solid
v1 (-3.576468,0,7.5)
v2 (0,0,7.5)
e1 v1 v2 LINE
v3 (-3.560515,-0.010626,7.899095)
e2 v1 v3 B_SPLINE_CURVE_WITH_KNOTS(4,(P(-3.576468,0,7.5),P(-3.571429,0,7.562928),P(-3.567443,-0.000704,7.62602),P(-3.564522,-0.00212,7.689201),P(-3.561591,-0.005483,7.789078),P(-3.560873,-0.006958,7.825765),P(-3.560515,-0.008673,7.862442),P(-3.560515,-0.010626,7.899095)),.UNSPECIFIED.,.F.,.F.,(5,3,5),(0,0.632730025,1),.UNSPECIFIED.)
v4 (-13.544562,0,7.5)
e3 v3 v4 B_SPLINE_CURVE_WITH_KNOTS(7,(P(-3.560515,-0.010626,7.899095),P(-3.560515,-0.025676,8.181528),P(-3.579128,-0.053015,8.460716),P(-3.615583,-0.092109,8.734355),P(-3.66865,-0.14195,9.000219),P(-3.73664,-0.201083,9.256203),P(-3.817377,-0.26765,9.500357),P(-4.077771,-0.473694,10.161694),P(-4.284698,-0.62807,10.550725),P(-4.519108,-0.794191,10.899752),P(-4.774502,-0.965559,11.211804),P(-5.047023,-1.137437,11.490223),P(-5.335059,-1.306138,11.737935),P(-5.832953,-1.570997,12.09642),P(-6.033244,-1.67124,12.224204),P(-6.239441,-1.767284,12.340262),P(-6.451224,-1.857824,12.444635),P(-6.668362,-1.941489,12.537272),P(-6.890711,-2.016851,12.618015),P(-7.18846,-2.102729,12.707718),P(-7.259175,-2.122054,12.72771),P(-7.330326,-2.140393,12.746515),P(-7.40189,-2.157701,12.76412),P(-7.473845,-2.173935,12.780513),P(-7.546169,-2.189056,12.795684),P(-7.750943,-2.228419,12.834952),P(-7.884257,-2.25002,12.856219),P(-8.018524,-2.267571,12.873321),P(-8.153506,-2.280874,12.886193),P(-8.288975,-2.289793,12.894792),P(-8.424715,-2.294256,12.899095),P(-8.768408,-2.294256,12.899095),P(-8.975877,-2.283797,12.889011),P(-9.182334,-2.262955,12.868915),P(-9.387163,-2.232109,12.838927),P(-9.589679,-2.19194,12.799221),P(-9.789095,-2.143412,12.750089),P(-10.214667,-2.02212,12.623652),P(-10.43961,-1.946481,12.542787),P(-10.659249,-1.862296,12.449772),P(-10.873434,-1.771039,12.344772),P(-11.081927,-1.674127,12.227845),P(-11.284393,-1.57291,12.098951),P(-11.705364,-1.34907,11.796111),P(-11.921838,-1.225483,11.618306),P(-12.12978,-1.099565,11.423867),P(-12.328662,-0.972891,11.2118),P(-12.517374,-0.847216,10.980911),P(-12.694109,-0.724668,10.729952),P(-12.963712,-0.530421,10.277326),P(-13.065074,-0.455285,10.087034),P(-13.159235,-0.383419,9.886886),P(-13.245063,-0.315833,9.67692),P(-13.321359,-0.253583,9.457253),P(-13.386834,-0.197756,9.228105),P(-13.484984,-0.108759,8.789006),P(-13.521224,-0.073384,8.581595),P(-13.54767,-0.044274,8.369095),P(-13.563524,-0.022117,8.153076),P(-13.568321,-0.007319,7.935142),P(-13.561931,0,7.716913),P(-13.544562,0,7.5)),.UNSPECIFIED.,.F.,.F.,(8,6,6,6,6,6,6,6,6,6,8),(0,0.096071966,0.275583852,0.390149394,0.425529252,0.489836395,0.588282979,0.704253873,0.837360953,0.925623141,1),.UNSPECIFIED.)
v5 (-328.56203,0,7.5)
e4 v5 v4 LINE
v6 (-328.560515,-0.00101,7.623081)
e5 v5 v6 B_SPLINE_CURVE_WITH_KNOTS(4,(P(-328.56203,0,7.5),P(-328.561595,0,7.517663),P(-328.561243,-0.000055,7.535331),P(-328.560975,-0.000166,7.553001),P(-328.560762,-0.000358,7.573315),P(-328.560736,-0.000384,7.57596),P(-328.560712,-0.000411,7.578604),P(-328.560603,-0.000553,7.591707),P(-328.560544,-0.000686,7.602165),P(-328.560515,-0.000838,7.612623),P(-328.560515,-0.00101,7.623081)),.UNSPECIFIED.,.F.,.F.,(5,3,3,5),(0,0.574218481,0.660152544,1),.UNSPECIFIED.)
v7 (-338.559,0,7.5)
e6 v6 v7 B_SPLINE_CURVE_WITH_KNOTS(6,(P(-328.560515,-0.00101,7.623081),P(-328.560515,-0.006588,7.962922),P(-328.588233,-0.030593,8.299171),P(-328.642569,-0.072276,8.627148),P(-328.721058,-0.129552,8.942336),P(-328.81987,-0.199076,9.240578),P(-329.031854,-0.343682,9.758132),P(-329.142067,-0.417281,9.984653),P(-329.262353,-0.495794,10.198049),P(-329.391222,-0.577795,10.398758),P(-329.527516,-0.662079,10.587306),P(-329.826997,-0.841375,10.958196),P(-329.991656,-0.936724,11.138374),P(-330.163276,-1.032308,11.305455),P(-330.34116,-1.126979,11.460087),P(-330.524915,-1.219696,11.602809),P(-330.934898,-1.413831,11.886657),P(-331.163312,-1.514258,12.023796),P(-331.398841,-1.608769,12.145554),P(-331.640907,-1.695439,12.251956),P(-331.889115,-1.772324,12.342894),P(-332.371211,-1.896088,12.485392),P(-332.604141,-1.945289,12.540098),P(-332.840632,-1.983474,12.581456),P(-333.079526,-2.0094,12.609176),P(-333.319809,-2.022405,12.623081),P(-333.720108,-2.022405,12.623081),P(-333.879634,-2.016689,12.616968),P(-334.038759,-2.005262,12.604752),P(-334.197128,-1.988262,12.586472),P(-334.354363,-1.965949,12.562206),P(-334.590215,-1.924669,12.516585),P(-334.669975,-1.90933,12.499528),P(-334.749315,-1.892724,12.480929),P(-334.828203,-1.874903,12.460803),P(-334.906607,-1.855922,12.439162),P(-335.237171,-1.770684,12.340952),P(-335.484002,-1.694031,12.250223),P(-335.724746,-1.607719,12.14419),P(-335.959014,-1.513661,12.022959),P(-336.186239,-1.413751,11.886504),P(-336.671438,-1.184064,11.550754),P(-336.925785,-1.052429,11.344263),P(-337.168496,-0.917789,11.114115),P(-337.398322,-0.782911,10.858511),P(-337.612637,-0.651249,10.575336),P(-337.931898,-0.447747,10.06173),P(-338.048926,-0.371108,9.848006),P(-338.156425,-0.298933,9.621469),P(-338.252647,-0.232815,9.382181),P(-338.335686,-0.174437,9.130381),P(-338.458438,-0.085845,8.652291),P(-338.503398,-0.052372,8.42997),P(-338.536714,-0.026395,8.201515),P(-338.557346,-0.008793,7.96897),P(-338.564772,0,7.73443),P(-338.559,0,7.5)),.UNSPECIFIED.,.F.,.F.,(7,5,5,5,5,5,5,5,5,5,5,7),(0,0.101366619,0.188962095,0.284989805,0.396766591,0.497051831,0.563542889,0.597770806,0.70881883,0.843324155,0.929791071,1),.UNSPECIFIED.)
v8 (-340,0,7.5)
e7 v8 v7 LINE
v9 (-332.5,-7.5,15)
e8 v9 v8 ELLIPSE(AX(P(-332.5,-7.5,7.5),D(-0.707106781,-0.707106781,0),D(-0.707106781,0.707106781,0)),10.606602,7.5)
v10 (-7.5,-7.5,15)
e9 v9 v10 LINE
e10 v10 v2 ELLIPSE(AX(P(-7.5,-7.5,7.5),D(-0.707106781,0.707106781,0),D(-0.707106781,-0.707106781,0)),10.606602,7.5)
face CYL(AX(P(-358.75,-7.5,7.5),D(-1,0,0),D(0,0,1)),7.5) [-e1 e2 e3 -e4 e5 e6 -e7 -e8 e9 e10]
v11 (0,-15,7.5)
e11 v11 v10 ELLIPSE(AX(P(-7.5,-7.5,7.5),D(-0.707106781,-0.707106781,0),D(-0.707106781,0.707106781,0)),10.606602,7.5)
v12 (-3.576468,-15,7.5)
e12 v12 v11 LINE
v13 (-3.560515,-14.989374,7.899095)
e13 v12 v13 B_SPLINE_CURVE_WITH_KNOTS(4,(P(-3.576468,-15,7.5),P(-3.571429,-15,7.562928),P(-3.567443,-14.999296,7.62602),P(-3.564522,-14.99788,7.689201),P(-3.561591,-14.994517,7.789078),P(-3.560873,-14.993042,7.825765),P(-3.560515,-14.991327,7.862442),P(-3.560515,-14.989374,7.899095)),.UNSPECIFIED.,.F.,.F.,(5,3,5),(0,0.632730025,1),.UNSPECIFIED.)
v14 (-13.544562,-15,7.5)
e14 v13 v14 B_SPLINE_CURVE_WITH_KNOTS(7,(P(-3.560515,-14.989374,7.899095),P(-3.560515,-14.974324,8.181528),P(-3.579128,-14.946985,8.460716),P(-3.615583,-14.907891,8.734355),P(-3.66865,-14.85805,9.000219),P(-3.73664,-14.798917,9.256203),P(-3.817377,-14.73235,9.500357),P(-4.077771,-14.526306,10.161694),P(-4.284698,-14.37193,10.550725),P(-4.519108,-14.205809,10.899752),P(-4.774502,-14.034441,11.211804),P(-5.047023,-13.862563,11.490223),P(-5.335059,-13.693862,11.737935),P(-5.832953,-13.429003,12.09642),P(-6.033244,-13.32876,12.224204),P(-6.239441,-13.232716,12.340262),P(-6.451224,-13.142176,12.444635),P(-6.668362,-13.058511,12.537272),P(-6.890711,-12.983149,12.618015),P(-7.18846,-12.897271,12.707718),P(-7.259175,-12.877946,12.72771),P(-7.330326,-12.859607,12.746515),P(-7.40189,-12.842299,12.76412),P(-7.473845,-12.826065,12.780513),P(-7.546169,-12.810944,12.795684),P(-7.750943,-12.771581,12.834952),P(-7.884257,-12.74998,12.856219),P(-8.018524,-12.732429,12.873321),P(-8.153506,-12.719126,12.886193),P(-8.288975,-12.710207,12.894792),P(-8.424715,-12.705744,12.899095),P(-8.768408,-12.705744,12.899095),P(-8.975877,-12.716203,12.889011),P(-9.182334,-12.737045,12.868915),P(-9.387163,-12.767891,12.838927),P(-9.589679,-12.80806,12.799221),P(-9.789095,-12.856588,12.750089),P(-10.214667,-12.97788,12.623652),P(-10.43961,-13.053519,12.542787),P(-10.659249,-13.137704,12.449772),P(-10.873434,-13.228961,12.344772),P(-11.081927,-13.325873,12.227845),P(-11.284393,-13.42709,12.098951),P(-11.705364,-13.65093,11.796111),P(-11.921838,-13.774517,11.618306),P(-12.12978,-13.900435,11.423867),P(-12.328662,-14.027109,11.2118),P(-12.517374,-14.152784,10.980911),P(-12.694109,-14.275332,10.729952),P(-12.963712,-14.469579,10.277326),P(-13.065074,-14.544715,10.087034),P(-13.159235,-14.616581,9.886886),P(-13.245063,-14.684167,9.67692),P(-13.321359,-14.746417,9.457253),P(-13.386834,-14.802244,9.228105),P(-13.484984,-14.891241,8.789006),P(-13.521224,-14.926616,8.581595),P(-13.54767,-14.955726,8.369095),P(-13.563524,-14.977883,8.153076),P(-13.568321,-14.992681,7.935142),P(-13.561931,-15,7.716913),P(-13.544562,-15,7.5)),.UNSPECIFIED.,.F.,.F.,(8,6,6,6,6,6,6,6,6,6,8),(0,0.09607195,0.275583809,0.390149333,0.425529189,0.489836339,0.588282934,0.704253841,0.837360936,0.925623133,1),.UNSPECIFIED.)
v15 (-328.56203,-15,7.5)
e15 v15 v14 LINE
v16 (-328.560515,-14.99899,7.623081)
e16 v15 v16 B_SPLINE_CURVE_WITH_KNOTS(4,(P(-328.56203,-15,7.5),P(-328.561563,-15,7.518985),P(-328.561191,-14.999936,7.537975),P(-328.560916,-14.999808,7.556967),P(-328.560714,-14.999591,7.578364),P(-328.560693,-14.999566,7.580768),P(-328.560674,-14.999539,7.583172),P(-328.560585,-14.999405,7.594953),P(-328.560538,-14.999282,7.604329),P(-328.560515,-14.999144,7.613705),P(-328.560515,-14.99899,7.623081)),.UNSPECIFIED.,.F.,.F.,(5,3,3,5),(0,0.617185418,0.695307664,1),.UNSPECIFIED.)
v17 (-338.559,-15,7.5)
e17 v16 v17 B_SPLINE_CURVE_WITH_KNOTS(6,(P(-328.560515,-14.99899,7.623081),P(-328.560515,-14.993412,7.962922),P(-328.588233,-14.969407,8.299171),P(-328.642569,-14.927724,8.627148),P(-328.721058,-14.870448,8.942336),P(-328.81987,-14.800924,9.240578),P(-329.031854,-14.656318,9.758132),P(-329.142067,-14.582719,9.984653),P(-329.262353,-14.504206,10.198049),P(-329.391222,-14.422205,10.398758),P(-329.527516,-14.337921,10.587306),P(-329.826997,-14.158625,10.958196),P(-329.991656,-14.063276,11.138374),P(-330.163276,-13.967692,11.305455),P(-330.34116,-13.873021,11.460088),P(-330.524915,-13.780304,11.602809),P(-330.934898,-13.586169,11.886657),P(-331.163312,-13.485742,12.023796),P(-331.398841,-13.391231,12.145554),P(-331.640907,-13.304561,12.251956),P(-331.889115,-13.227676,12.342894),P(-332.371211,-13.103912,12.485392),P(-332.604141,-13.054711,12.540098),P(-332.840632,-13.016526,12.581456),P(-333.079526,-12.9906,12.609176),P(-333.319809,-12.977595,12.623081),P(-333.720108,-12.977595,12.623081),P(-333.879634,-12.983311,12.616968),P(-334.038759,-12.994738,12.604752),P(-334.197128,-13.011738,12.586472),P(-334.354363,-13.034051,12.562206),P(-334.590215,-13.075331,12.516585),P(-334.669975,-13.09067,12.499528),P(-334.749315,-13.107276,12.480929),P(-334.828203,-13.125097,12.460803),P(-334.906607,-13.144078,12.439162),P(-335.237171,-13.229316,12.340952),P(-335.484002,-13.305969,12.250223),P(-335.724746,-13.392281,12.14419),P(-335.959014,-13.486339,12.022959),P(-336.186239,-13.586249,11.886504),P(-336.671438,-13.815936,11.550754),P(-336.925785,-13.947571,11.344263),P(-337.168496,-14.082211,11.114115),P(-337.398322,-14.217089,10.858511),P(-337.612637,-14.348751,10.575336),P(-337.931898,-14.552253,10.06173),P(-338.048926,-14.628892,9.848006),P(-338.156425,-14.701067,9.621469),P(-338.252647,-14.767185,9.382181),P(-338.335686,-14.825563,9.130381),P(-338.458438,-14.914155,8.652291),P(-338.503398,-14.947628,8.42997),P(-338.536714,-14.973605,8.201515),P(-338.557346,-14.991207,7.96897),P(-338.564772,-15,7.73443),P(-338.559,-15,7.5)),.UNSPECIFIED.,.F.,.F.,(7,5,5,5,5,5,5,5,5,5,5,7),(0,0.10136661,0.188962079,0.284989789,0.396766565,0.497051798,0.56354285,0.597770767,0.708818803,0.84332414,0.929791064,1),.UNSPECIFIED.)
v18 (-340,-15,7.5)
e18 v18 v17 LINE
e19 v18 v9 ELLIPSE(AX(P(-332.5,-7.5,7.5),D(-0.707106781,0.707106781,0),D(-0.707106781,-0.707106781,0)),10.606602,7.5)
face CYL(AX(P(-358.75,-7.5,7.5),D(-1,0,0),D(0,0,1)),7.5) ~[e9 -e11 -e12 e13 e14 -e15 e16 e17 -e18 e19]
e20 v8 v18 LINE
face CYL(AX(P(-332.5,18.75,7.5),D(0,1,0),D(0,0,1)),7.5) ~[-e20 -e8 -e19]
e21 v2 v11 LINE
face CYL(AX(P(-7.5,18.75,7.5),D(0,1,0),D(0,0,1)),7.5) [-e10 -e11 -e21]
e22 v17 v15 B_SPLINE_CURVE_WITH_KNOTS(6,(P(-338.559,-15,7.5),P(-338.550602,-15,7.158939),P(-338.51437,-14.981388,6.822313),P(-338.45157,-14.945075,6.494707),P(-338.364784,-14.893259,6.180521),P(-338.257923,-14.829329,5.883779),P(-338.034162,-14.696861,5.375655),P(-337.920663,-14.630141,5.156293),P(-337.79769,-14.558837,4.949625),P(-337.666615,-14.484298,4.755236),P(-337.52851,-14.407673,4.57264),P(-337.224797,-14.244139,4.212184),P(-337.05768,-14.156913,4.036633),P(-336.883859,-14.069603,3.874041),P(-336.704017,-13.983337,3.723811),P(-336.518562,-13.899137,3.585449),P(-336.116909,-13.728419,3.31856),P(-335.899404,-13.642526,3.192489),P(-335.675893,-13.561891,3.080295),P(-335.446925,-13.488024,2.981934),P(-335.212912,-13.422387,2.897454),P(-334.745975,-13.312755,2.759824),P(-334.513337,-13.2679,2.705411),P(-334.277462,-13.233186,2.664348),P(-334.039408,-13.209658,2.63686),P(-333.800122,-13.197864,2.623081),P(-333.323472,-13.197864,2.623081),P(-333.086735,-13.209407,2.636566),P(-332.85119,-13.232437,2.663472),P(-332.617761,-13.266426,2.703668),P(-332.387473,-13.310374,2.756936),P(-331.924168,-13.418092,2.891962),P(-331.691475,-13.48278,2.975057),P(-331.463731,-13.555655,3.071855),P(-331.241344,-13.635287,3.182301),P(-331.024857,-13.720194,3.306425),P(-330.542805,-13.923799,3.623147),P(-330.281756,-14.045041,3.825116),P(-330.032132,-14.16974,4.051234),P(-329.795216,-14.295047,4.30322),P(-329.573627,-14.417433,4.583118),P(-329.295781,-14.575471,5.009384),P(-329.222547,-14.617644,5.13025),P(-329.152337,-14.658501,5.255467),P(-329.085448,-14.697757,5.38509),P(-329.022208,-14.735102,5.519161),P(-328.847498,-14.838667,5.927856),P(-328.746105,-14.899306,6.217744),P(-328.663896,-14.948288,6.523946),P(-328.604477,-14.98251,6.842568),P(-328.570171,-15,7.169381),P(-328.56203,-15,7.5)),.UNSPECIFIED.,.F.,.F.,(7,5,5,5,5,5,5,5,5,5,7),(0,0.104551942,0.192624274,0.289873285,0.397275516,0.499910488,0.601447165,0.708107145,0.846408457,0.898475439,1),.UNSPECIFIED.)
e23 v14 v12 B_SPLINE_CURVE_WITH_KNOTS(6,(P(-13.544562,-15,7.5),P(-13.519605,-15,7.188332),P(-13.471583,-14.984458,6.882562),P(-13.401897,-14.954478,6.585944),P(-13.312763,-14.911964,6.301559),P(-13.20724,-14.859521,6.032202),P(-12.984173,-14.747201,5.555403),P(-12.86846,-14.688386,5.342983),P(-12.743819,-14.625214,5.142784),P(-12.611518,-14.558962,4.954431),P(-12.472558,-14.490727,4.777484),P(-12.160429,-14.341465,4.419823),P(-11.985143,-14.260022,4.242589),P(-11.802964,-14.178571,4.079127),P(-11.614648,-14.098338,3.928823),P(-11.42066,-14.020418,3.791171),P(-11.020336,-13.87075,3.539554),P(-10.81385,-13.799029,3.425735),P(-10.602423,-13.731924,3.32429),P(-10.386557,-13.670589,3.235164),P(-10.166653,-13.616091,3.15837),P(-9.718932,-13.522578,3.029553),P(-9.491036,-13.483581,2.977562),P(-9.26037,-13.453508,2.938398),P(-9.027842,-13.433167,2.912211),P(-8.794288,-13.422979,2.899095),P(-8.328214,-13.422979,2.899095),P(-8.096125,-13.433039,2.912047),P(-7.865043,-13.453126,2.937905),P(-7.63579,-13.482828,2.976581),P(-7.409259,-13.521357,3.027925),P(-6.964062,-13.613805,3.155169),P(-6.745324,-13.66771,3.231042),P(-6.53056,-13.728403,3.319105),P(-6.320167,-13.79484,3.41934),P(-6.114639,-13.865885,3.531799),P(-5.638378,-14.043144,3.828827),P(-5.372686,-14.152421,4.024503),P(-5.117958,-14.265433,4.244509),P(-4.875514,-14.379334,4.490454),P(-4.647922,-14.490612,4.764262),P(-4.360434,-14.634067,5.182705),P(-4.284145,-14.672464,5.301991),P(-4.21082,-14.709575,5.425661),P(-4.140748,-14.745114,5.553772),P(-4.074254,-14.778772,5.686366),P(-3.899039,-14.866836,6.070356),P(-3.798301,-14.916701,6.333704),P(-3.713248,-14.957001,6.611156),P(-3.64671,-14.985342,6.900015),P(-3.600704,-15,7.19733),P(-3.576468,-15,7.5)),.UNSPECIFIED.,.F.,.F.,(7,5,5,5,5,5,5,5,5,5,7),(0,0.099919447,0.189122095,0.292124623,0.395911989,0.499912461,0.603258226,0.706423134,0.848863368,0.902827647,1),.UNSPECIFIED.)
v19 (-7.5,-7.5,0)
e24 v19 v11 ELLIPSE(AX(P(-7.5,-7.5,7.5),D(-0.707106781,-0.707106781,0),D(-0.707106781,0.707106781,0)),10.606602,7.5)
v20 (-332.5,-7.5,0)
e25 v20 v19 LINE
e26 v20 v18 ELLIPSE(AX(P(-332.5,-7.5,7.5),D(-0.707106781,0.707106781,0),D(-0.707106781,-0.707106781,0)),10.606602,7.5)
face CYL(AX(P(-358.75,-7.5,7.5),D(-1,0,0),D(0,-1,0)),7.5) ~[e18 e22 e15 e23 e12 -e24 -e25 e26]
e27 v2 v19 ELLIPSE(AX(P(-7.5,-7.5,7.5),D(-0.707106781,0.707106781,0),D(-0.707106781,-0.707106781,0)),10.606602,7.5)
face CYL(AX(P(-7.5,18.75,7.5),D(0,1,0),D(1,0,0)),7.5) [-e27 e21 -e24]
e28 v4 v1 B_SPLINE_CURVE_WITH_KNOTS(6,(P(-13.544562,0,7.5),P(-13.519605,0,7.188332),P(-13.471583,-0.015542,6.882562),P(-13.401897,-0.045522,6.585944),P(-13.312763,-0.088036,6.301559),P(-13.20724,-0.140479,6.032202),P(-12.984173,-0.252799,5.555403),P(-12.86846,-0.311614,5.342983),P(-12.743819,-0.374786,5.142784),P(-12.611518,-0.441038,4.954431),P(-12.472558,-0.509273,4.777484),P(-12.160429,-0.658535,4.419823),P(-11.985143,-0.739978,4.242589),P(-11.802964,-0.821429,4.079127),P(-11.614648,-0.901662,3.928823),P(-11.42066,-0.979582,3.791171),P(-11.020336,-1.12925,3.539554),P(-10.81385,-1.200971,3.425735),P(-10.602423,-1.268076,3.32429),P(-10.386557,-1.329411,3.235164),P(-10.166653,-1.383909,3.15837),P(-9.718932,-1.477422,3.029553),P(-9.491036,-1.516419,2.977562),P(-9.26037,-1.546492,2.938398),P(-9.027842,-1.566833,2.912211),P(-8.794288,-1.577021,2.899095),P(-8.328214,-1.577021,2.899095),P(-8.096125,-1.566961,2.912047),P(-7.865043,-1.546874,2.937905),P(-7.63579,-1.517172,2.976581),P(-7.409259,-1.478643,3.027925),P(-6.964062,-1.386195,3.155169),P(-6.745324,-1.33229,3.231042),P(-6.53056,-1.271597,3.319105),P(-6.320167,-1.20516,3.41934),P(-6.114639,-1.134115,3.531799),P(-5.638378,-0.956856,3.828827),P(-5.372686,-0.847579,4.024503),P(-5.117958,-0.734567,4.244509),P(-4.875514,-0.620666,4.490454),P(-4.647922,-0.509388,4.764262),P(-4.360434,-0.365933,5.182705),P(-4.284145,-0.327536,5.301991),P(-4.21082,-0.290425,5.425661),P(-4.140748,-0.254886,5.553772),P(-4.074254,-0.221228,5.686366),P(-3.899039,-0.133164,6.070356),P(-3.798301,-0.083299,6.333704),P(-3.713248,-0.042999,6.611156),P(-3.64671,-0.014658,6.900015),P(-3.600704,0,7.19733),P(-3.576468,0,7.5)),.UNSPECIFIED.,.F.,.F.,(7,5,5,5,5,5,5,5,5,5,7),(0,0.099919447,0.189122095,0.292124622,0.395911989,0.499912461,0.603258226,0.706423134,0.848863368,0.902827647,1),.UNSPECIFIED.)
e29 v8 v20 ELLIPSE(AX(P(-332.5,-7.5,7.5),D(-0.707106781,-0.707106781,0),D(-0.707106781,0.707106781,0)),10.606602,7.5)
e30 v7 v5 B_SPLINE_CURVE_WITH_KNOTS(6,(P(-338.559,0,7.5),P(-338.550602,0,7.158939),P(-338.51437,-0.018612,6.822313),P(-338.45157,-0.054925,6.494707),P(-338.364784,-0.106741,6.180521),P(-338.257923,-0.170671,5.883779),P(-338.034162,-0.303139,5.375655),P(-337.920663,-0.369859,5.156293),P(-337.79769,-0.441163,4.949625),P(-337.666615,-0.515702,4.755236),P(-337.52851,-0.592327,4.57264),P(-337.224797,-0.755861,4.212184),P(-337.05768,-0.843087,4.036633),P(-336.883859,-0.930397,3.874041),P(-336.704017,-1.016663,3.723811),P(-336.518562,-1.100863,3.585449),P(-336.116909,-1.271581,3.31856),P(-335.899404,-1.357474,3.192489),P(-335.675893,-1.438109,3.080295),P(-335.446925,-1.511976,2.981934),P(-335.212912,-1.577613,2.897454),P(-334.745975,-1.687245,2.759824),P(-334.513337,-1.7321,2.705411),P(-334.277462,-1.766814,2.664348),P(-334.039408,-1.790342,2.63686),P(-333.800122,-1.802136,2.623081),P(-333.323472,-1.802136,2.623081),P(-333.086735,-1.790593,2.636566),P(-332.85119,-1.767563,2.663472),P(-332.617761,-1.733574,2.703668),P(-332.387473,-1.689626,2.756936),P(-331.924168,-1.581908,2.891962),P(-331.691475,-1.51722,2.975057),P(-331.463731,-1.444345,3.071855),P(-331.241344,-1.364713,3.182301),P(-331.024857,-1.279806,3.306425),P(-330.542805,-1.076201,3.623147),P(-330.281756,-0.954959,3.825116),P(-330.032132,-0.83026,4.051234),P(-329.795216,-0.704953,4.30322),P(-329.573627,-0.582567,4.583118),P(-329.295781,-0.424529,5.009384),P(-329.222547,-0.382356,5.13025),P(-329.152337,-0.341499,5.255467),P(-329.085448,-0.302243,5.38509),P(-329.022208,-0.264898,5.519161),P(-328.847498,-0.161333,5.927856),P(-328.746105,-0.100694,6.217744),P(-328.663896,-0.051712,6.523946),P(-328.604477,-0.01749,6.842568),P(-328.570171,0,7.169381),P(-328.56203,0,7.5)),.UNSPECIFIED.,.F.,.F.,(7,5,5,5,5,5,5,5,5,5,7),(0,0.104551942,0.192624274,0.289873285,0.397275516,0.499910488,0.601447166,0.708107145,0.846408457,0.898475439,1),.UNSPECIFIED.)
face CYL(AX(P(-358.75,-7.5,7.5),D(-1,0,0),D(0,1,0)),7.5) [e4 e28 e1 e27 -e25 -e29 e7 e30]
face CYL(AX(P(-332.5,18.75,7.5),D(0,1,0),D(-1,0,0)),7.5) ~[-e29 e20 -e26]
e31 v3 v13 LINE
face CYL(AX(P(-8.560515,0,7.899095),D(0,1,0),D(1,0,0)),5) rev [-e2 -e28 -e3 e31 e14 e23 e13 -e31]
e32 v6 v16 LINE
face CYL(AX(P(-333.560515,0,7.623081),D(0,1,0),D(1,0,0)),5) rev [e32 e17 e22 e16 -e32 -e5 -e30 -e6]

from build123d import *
from build123d import SkipClean  # not in build123d's __all__

# Parameters (mm, degrees)
F0_W        = 340
F0_H        = 15
F1_DEPTH    = 15
F2_R        = 5
F3_DEPTH    = 20
F4_T1_DEPTH = 377.5
F4_T3_DEPTH = 52.5


# Not quite as in the source:
# - a fillet or chamfer that OpenCascade refuses, or shapes differently, is made with other operations: its cross-section is extruded or revolved along the edge and cut away or added


with BuildPart() as f1:
    # F0 (on Front) → F1 (new body)
    with BuildSketch(Plane.XZ):
        with Locations((-170, 7.5)):
            Rectangle(F0_W, F0_H)
    extrude(amount=F1_DEPTH)

    # F2 (on Front) → F3 (cut)
    with BuildSketch(Plane.XZ):
        with Locations((-333.5605150089, 7.6230808641)):
            Circle(F2_R)
        with Locations((-8.5605150089, 7.8990953043)):
            Circle(F2_R)
    extrude(amount=F3_DEPTH, mode=Mode.SUBTRACT)

    # F4: fillet of radius 7.5 on 8 edges, made by hand

    # F4_s2 → F4_t1 (cut)
    with BuildSketch(Plane.YZ.offset(-358.75)):
        with BuildLine():
            ThreePointArc((-7.5, 15), (-2.1966991411, 12.8033008589), (0, 7.5))
            Line((0, 7.5), (0, 15))
            Line((0, 15), (-7.5, 15))
        make_face()
        with BuildLine():
            ThreePointArc((0, 7.5), (-2.1966991411, 2.1966991411), (-7.5, 0))
            Line((-7.5, 0), (0, 0))
            Line((0, 0), (0, 7.5))
        make_face()
        with BuildLine():
            ThreePointArc((-7.5, 15), (-12.8033008589, 12.8033008589), (-15, 7.5))
            Line((-15, 7.5), (-15, 15))
            Line((-15, 15), (-7.5, 15))
        make_face()
        with BuildLine():
            ThreePointArc((-15, 7.5), (-12.8033008589, 2.1966991411), (-7.5, 0))
            Line((-7.5, 0), (-15, 0))
            Line((-15, 0), (-15, 7.5))
        make_face()
    with SkipClean():  # cleaning this boolean's faces spoils the solid; the shape is the same uncleaned
        extrude(amount=F4_T1_DEPTH, mode=Mode.SUBTRACT)

    # F4_s4 → F4_t3 (cut)
    with BuildSketch(Plane.XZ.offset(-18.75)):
        with BuildLine():
            ThreePointArc((-7.5, 15), (-2.1966991411, 12.8033008589), (0, 7.5))
            Line((0, 7.5), (0, 15))
            Line((0, 15), (-7.5, 15))
        make_face()
        with BuildLine():
            ThreePointArc((0, 7.5), (-2.1966991411, 2.1966991411), (-7.5, 0))
            Line((-7.5, 0), (0, 0))
            Line((0, 0), (0, 7.5))
        make_face()
        with BuildLine():
            ThreePointArc((-332.5, 15), (-337.8033008589, 12.8033008589), (-340, 7.5))
            Line((-340, 7.5), (-340, 15))
            Line((-340, 15), (-332.5, 15))
        make_face()
        with BuildLine():
            ThreePointArc((-340, 7.5), (-337.8033008589, 2.1966991411), (-332.5, 0))
            Line((-332.5, 0), (-340, 0))
            Line((-340, 0), (-340, 7.5))
        make_face()
    with SkipClean():  # cleaning this boolean's faces spoils the solid; the shape is the same uncleaned
        extrude(amount=F4_T3_DEPTH, mode=Mode.SUBTRACT)


solid = f1.part
